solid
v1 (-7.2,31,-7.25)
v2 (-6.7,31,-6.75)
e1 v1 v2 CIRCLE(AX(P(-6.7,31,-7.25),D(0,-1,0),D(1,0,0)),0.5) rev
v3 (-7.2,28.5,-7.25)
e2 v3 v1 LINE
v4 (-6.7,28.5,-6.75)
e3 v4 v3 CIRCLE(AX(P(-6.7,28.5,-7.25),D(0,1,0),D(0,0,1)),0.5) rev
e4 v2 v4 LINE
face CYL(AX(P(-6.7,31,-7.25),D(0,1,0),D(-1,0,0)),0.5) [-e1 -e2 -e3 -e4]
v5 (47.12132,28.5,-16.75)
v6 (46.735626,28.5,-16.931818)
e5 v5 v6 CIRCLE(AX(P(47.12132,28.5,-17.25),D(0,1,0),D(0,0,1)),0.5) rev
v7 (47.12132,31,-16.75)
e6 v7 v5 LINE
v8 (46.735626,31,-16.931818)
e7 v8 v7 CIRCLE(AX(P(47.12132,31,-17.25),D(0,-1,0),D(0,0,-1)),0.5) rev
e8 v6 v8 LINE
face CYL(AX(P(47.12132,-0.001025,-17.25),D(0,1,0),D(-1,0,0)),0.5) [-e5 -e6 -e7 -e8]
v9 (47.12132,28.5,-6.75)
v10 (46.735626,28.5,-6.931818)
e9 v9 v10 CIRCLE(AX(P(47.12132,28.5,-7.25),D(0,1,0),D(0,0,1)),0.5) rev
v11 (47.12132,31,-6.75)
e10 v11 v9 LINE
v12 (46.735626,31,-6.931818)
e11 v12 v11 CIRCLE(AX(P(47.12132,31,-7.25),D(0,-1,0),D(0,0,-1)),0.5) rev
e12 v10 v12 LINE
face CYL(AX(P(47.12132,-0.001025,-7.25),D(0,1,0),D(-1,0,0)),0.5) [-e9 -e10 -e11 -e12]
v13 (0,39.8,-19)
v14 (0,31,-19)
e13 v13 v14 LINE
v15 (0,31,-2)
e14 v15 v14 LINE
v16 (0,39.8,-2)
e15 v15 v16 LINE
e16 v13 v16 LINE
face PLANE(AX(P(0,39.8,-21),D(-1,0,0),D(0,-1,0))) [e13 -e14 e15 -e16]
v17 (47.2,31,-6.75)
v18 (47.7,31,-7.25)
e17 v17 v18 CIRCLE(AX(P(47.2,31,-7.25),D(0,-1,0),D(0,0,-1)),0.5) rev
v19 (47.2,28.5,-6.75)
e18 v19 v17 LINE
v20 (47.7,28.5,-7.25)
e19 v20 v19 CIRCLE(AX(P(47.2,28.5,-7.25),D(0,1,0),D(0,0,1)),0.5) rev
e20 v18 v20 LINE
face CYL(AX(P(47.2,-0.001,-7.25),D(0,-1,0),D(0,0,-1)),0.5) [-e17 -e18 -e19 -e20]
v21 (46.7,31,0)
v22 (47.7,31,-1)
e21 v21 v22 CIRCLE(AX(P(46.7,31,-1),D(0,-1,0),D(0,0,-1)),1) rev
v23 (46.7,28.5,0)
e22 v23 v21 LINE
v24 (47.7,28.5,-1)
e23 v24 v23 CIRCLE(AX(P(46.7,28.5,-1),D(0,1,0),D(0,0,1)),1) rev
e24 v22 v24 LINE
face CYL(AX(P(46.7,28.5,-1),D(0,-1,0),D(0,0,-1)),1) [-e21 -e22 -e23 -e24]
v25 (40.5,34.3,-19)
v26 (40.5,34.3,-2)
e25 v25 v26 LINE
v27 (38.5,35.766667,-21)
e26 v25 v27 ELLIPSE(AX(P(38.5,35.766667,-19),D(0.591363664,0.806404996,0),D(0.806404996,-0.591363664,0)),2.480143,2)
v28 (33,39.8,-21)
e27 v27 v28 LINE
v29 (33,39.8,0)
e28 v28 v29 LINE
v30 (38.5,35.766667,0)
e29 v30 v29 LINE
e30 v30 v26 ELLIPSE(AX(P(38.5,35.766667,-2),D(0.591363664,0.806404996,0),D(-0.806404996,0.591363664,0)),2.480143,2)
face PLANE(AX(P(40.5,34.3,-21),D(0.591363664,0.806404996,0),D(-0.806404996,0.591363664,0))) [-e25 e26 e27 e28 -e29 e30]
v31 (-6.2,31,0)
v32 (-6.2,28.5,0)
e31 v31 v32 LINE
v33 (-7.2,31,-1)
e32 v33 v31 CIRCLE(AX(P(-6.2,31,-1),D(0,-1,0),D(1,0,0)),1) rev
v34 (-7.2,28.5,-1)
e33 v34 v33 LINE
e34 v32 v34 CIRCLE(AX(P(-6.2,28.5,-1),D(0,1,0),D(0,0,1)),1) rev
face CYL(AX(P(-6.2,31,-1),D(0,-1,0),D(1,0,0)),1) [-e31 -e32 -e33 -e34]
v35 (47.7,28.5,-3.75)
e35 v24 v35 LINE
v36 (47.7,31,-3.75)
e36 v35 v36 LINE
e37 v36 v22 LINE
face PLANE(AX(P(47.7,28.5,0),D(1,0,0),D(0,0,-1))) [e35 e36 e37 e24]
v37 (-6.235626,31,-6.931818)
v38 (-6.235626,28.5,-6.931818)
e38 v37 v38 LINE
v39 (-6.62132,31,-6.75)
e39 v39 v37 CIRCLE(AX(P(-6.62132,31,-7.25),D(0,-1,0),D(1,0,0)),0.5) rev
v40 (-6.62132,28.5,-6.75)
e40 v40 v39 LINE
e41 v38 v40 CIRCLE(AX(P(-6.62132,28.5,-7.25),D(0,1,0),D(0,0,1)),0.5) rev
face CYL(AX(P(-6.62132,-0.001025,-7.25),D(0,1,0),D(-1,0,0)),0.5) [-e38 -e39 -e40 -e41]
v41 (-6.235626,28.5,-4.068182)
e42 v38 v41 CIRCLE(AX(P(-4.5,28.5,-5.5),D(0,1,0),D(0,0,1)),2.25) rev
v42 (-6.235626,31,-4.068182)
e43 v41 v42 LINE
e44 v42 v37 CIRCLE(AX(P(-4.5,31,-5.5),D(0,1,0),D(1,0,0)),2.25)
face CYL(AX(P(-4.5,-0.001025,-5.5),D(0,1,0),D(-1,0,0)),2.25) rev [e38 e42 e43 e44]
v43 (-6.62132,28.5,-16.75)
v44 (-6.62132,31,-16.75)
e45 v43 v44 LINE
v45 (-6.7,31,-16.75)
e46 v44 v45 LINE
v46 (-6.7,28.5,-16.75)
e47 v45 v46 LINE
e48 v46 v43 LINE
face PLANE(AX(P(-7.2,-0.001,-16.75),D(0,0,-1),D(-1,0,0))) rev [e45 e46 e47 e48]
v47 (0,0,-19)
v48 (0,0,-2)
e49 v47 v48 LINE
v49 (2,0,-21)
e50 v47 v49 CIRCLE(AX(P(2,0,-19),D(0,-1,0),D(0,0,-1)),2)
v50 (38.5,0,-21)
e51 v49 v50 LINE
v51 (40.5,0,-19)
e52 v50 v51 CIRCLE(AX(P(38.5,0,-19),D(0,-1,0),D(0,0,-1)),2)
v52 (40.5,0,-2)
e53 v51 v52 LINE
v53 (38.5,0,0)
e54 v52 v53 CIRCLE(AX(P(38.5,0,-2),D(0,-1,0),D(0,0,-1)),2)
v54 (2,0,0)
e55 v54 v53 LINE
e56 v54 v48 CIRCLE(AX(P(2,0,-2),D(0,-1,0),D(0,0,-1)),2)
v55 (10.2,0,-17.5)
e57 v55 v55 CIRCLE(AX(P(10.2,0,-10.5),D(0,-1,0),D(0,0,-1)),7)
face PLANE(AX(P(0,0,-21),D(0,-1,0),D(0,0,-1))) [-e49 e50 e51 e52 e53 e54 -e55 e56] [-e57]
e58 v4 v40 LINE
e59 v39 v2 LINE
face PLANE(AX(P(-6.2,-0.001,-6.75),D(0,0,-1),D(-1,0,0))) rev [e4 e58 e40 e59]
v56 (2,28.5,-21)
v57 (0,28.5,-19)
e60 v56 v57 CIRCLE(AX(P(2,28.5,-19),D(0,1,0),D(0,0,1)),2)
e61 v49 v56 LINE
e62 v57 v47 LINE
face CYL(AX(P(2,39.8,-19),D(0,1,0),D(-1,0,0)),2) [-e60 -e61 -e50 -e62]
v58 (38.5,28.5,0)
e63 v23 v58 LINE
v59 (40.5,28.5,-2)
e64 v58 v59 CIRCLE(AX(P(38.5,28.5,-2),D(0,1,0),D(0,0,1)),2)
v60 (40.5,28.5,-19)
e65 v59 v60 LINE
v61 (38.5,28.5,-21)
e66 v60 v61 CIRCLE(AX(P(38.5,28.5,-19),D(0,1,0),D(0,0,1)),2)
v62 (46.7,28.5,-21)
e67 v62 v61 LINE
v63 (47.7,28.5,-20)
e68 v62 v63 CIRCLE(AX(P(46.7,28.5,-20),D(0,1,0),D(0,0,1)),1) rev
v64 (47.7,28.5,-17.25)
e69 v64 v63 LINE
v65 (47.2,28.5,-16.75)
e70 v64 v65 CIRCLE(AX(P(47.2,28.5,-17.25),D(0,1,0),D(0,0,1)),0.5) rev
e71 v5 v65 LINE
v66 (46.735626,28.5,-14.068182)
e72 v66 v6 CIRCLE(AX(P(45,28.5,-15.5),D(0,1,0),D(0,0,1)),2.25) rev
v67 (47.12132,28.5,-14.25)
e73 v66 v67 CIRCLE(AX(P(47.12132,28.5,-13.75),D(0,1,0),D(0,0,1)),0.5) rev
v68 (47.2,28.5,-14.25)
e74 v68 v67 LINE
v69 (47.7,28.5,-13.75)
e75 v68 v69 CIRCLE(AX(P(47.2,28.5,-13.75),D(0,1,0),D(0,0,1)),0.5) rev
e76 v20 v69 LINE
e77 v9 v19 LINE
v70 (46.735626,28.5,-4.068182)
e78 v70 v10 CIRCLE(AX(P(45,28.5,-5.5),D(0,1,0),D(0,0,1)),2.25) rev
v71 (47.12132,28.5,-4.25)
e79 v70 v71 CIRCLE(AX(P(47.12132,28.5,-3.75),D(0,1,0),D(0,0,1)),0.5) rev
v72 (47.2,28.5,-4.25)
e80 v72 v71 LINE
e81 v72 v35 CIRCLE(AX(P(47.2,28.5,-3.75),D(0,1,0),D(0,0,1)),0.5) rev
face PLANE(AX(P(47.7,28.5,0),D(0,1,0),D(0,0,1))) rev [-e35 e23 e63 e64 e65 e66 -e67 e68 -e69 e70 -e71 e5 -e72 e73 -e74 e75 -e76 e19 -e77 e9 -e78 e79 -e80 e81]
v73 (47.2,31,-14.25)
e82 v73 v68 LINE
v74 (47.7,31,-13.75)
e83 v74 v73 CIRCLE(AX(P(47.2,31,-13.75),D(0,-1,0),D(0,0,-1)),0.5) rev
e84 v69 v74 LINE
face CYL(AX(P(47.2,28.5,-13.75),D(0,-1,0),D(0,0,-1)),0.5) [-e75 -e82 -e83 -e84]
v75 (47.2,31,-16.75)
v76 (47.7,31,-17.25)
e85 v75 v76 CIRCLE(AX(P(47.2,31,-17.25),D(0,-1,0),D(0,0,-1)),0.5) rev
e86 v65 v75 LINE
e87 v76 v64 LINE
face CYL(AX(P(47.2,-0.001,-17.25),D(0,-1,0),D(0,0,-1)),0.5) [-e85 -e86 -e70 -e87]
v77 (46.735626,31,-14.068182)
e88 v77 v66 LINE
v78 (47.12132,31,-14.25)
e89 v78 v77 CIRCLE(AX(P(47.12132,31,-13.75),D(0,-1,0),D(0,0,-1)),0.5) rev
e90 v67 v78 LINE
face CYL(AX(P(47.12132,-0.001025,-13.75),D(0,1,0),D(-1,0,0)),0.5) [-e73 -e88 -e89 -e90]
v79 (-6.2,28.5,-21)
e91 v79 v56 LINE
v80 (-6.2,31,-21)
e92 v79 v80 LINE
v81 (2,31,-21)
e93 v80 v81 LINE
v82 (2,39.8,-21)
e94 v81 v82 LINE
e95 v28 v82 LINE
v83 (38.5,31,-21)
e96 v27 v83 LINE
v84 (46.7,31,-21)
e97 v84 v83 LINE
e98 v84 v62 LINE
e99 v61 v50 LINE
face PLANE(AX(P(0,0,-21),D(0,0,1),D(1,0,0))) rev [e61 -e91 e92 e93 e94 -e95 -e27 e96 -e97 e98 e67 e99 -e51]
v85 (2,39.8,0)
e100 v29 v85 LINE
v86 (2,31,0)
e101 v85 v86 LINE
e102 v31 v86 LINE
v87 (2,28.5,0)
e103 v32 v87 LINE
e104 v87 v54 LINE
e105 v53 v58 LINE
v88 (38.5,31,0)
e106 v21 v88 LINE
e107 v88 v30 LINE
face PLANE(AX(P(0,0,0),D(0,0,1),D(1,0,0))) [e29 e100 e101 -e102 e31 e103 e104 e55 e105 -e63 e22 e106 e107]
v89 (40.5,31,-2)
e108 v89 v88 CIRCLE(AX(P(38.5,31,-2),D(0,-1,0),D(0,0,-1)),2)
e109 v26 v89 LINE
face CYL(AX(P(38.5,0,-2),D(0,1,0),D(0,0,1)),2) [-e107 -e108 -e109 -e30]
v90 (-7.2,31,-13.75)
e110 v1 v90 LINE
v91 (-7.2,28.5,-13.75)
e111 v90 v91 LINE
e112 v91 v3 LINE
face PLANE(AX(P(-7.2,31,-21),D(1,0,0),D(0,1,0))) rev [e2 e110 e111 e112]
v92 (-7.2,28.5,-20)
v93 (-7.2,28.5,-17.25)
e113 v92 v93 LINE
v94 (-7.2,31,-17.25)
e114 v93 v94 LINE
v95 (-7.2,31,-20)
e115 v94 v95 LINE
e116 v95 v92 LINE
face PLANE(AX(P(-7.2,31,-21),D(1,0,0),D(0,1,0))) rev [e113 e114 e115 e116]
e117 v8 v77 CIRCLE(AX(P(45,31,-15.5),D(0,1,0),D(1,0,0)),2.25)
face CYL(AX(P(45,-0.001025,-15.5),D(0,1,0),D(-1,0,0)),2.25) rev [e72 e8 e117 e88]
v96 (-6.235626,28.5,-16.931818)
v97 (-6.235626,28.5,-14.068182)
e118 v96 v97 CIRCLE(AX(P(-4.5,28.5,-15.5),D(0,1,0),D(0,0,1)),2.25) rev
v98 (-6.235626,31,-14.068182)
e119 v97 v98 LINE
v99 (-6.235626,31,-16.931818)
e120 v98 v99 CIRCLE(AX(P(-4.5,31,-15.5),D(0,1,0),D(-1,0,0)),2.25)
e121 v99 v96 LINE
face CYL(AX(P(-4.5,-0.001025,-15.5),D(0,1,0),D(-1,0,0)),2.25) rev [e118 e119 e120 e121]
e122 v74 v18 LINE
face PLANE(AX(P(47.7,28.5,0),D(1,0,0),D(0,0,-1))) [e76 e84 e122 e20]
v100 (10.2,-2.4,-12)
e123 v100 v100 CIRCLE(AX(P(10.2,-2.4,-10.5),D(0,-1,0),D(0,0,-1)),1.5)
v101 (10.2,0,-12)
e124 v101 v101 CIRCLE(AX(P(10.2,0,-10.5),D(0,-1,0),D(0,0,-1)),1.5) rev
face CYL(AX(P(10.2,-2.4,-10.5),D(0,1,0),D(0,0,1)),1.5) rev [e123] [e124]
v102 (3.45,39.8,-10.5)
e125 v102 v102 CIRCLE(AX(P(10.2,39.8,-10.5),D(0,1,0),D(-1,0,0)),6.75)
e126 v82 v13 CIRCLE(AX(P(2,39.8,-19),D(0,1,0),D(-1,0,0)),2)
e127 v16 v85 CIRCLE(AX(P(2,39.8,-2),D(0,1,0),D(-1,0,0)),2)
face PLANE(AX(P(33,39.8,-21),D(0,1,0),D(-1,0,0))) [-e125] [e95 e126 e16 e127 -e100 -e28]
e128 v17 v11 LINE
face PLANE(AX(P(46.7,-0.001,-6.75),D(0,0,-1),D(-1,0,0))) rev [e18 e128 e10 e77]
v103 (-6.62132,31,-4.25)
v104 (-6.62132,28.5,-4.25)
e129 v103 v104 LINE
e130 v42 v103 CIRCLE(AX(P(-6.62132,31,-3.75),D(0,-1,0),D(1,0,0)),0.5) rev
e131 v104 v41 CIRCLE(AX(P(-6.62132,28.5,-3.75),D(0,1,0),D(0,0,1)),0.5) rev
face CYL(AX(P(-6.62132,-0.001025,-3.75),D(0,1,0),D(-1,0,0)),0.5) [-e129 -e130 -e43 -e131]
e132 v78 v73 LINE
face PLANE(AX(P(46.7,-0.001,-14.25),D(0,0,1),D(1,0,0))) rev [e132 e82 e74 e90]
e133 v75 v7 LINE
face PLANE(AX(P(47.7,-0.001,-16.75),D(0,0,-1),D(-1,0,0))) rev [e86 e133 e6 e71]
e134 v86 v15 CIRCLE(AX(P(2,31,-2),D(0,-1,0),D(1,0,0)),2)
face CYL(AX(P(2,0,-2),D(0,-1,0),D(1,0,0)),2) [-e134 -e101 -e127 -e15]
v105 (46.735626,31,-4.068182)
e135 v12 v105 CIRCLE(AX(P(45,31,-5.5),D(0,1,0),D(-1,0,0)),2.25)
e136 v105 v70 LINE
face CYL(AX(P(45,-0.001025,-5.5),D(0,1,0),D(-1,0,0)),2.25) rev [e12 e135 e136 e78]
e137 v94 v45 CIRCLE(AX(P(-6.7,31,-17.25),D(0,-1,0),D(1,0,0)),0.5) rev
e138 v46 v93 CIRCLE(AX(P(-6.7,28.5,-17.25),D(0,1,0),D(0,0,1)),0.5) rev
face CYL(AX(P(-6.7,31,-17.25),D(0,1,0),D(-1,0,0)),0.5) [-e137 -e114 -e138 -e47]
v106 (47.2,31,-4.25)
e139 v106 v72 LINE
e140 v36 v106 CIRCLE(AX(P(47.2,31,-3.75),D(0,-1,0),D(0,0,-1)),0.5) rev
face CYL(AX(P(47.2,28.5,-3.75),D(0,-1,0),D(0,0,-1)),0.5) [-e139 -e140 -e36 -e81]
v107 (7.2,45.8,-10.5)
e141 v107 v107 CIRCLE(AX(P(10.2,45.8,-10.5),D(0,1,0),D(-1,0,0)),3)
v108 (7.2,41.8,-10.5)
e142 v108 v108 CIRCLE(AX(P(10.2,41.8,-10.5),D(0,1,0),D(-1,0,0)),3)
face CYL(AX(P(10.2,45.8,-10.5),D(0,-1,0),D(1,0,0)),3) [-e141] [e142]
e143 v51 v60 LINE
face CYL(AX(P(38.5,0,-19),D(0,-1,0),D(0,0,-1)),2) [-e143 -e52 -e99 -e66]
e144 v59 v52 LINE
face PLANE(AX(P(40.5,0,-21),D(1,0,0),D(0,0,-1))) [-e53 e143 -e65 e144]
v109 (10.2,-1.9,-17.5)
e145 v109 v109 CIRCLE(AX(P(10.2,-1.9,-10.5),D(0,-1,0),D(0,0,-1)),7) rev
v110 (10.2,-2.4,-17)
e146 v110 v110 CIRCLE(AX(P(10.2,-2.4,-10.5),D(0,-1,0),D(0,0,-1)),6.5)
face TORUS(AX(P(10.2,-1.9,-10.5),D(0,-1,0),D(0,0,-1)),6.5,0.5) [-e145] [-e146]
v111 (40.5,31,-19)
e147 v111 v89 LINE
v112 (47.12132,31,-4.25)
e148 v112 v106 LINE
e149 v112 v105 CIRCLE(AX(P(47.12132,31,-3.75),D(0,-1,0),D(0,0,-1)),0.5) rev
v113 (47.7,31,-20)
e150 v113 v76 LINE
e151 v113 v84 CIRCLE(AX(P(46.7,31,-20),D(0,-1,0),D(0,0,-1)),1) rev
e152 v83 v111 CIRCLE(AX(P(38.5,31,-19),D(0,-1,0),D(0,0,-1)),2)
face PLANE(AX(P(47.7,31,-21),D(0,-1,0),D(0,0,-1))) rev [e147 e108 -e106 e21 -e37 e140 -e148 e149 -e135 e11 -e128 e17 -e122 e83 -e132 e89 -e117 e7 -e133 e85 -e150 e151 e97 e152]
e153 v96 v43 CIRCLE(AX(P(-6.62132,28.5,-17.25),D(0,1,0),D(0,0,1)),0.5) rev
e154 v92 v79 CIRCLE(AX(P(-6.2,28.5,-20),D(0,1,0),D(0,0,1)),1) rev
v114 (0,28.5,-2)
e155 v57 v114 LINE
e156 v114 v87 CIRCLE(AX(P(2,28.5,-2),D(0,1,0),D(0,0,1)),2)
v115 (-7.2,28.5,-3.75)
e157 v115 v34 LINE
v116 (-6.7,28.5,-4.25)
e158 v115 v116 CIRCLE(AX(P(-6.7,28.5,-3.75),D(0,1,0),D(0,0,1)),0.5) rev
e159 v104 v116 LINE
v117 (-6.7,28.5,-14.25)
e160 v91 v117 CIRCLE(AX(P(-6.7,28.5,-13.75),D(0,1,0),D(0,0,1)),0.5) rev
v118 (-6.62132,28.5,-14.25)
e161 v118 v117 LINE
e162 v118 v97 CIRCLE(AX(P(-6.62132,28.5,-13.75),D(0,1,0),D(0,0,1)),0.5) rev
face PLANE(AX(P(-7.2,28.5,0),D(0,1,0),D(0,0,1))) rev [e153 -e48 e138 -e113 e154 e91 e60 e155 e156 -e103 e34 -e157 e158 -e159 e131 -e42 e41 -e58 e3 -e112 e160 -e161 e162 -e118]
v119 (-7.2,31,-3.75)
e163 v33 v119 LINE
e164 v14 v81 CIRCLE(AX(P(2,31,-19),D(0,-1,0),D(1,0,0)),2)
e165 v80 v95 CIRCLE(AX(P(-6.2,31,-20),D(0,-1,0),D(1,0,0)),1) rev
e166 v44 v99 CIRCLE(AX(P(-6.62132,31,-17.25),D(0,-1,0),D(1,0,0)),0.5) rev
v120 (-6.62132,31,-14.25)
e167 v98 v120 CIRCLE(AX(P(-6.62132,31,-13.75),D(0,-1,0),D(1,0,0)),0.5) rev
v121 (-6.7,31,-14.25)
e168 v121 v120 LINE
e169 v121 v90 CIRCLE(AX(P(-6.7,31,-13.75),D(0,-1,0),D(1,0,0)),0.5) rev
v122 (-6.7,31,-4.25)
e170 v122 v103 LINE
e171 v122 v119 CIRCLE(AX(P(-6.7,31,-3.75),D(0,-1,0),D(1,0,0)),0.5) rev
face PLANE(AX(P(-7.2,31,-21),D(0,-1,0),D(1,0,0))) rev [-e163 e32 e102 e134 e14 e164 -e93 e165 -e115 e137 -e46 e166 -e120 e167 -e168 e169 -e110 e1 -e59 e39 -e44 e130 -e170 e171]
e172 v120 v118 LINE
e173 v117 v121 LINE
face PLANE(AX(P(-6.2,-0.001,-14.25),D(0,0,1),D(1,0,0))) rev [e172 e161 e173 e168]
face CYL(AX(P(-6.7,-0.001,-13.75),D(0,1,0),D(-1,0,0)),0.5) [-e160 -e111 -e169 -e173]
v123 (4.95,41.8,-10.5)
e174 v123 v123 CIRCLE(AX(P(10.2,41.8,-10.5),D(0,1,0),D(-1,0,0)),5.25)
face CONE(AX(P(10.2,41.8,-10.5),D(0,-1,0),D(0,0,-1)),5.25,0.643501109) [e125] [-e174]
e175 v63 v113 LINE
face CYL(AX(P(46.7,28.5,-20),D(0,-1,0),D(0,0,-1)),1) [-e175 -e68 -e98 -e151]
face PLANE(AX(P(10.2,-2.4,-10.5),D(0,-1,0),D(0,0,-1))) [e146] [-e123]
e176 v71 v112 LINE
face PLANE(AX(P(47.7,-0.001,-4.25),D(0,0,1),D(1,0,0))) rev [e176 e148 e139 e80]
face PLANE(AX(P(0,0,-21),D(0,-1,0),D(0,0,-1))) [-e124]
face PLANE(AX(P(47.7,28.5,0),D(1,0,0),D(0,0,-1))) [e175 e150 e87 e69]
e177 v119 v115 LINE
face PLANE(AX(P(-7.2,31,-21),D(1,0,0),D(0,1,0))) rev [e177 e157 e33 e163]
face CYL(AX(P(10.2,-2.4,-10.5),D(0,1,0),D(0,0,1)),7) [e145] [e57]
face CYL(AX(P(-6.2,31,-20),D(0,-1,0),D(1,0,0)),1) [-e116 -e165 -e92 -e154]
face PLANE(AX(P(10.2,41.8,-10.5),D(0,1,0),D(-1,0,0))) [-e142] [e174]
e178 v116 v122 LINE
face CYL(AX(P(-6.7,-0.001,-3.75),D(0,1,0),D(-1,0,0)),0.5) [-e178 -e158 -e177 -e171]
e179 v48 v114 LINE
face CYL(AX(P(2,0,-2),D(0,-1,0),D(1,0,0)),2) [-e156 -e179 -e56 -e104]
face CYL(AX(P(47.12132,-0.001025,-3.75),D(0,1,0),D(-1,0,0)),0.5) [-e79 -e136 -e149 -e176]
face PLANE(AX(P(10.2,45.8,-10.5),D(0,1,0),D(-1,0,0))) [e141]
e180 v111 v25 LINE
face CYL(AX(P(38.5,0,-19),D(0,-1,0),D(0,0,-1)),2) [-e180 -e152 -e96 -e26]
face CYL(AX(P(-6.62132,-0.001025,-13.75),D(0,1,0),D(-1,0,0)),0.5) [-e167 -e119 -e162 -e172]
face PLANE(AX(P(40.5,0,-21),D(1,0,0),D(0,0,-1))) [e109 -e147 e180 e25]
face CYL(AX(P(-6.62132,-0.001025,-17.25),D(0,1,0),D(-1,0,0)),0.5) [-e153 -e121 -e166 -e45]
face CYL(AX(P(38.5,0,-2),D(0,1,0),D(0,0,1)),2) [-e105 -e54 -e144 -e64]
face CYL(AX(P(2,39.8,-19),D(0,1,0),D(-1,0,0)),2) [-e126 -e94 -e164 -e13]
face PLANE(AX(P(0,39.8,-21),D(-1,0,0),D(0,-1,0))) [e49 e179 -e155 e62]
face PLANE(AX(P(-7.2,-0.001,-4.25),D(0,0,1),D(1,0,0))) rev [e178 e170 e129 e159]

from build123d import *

# Parameters (mm, degrees)
EXTRUSION1_DEPTH = 21
ESQUISSE2_W      = 21
ESQUISSE2_H      = 2.5
EXTRUSION2_DEPTH = 7.2
ESQUISSE3_W      = 21
ESQUISSE3_H      = 2.5
EXTRUSION3_DEPTH = 7.2
EXTRUSION4_REACH = 62.641
ESQUISSE4_R      = 2.25
CONG_1_R         = 1
CONG_2_R         = 2
ESQUISSE5_R      = 3
EXTRUSION5_DEPTH = 6
ESQUISSE7_R      = 6.75
EXTRUSION6_DEPTH = 2
CHANFREIN1_SIZE2 = 1.5
CHANFREIN1_SIZE  = 2
EXTRUSION7_REACH = 62.641
ESQUISSE8_W      = 1
ESQUISSE8_H      = 2.5
CONG_3_R         = 0.5
ESQUISSE9_R      = 7
ESQUISSE9_R_2    = 1.5
EXTRUSION8_DEPTH = 2.4
CONG_4_R         = 0.5


with BuildPart() as part:
    # Esquisse1 → Extrusion1 (new body)
    with BuildSketch(Plane.XY):
        Polygon((0, 0), (40.5, 0), (40.5, 34.3), (33, 39.8), (0, 39.8), align=None)
    extrude(amount=-EXTRUSION1_DEPTH)

    # Esquisse2 → Extrusion2 (add)
    with BuildSketch(Plane(origin=(40.5, 0, 0), x_dir=(0, 0, -1), z_dir=(1, 0, 0))):
        with Locations((10.5, 29.75)):
            Rectangle(ESQUISSE2_W, ESQUISSE2_H)
    extrude(amount=EXTRUSION2_DEPTH)

    # Esquisse3 → Extrusion3 (add)
    with BuildSketch(Plane.ZY):
        with Locations((-10.5, 29.75)):
            Rectangle(ESQUISSE3_W, ESQUISSE3_H)
    extrude(amount=EXTRUSION3_DEPTH)

    # Esquisse4 → Extrusion4 (cut, up to next)
    with BuildSketch(Plane(origin=(0, 31, 0), x_dir=(-1, 0, 0), z_dir=(0, 1, 0)), mode=Mode.PRIVATE) as extrusion4_sk1:
        with Locations((4.5, -15.5)):
            Circle(ESQUISSE4_R)
    extrusion4_tool1 = extrude(extrusion4_sk1.sketch, amount=-EXTRUSION4_REACH, mode=Mode.PRIVATE) & part.part
    # Esquisse4 → Extrusion4 (cut, up to next)
    with BuildSketch(Plane(origin=(0, 31, 0), x_dir=(-1, 0, 0), z_dir=(0, 1, 0)), mode=Mode.PRIVATE) as extrusion4_sk2:
        with Locations(Location((-45, -15.5, 0), (0, 0, 90))):
            Circle(ESQUISSE4_R)
    extrusion4_tool2 = extrude(extrusion4_sk2.sketch, amount=-EXTRUSION4_REACH, mode=Mode.PRIVATE) & part.part
    # Esquisse4 → Extrusion4 (cut, up to next)
    with BuildSketch(Plane(origin=(0, 31, 0), x_dir=(-1, 0, 0), z_dir=(0, 1, 0)), mode=Mode.PRIVATE) as extrusion4_sk3:
        with Locations((-45, -5.5)):
            Circle(ESQUISSE4_R)
    extrusion4_tool3 = extrude(extrusion4_sk3.sketch, amount=-EXTRUSION4_REACH, mode=Mode.PRIVATE) & part.part
    # Esquisse4 → Extrusion4 (cut, up to next)
    with BuildSketch(Plane(origin=(0, 31, 0), x_dir=(-1, 0, 0), z_dir=(0, 1, 0)), mode=Mode.PRIVATE) as extrusion4_sk4:
        with Locations(Location((4.5, -5.5, 0), (0, 0, 90))):
            Circle(ESQUISSE4_R)
    extrusion4_tool4 = extrude(extrusion4_sk4.sketch, amount=-EXTRUSION4_REACH, mode=Mode.PRIVATE) & part.part
    add(extrusion4_tool1.solids().sort_by_distance((-4.5, 31, -15.5))[0], mode=Mode.SUBTRACT)
    add(extrusion4_tool2.solids().sort_by_distance((45, 31, -15.5))[0], mode=Mode.SUBTRACT)
    add(extrusion4_tool3.solids().sort_by_distance((45, 31, -5.5))[0], mode=Mode.SUBTRACT)
    add(extrusion4_tool4.solids().sort_by_distance((-4.5, 31, -5.5))[0], mode=Mode.SUBTRACT)

    # Congé1
    cong_1_edges = [part.edges().sort_by_distance(p)[0] for p in [
        (47.7, 29.75, 0),
        (47.7, 29.75, -21),
        (-7.2, 29.75, -21),
        (-7.2, 29.75, 0),
    ]]
    fillet(cong_1_edges, radius=CONG_1_R)

    # Congé2
    cong_2_edges = [part.edges().sort_by_distance(p)[0] for p in [
        (0, 35.4, -21),
        (0, 14.25, -21),
        (0, 35.4, 0),
        (0, 14.25, 0),
        (40.5, 32.65, 0),
        (40.5, 14.25, 0),
        (40.5, 32.65, -21),
        (40.5, 14.25, -21),
    ]]
    fillet(cong_2_edges, radius=CONG_2_R)

    # Esquisse5 → Extrusion5 (add)
    with BuildSketch(Plane(origin=(0, 39.8, 0), x_dir=(-1, 0, 0), z_dir=(0, 1, 0))):
        with Locations((-10.2, -10.5)):
            Circle(ESQUISSE5_R)
    extrude(amount=EXTRUSION5_DEPTH)

    # Esquisse7 → Extrusion6 (add)
    with BuildSketch(Plane(origin=(0, 39.8, 0), x_dir=(-1, 0, 0), z_dir=(0, 1, 0))):
        with Locations((-10.2, -10.5)):
            Circle(ESQUISSE7_R)
    extrude(amount=EXTRUSION6_DEPTH)

    # Chanfrein1
    chanfrein1_edges = [part.edges().sort_by_distance(p)[0] for p in [
        (16.95, 41.8, -10.5),
    ]]
    chanfrein1_side = [part.faces().sort_by_distance(p)[0] for p in [
        (16.95, 41.77, -10.5),
    ]]
    chamfer(chanfrein1_edges, length=CHANFREIN1_SIZE - 0.0001, length2=CHANFREIN1_SIZE2 - 0.0001, reference=chanfrein1_side[0])  # a hair under: the kernel refuses the full size

    # Esquisse8 → Extrusion7 (cut, up to next)
    with BuildSketch(Plane(origin=(0, 31, 0), x_dir=(-1, 0, 0), z_dir=(0, 1, 0)), mode=Mode.PRIVATE) as extrusion7_sk1:
        with Locations((6.7, -15.5)):
            Rectangle(ESQUISSE8_W, ESQUISSE8_H)
    extrusion7_tool1 = extrude(extrusion7_sk1.sketch, amount=-EXTRUSION7_REACH, mode=Mode.PRIVATE) & part.part
    # Esquisse8 → Extrusion7 (cut, up to next)
    with BuildSketch(Plane(origin=(0, 31, 0), x_dir=(-1, 0, 0), z_dir=(0, 1, 0)), mode=Mode.PRIVATE) as extrusion7_sk2:
        with Locations((6.7, -5.5)):
            Rectangle(ESQUISSE8_W, ESQUISSE8_H)
    extrusion7_tool2 = extrude(extrusion7_sk2.sketch, amount=-EXTRUSION7_REACH, mode=Mode.PRIVATE) & part.part
    # Esquisse8 → Extrusion7 (cut, up to next)
    with BuildSketch(Plane(origin=(0, 31, 0), x_dir=(-1, 0, 0), z_dir=(0, 1, 0)), mode=Mode.PRIVATE) as extrusion7_sk3:
        with Locations((-47.2, -15.5)):
            Rectangle(ESQUISSE8_W, ESQUISSE8_H)
    extrusion7_tool3 = extrude(extrusion7_sk3.sketch, amount=-EXTRUSION7_REACH, mode=Mode.PRIVATE) & part.part
    # Esquisse8 → Extrusion7 (cut, up to next)
    with BuildSketch(Plane(origin=(0, 31, 0), x_dir=(-1, 0, 0), z_dir=(0, 1, 0)), mode=Mode.PRIVATE) as extrusion7_sk4:
        with Locations((-47.2, -5.5)):
            Rectangle(ESQUISSE8_W, ESQUISSE8_H)
    extrusion7_tool4 = extrude(extrusion7_sk4.sketch, amount=-EXTRUSION7_REACH, mode=Mode.PRIVATE) & part.part
    add(extrusion7_tool1.solids().sort_by_distance((-6.7, 31, -15.5))[0], mode=Mode.SUBTRACT)
    add(extrusion7_tool2.solids().sort_by_distance((-6.7, 31, -5.5))[0], mode=Mode.SUBTRACT)
    add(extrusion7_tool3.solids().sort_by_distance((47.2, 31, -15.5))[0], mode=Mode.SUBTRACT)
    add(extrusion7_tool4.solids().sort_by_distance((47.2, 31, -5.5))[0], mode=Mode.SUBTRACT)

    # Congé3
    cong_3_edges = [part.edges().sort_by_distance(p)[0] for p in [
        (-7.2, 29.75, -14.25),
        (-7.2, 29.75, -16.75),
        (-6.370828693, 29.75, -16.75),
        (-6.370828693, 29.75, -14.25),
        (-6.370828693, 29.75, -6.75),
        (-6.370828693, 29.75, -4.25),
        (-7.2, 29.75, -6.75),
        (-7.2, 29.75, -4.25),
        (46.870828693, 29.75, -14.25),
        (46.870828693, 29.75, -16.75),
        (47.7, 29.75, -14.25),
        (47.7, 29.75, -16.75),
        (47.7, 29.75, -6.75),
        (47.7, 29.75, -4.25),
        (46.870828693, 29.75, -6.75),
        (46.870828693, 29.75, -4.25),
    ]]
    fillet(cong_3_edges, radius=CONG_3_R)

    # Esquisse9 → Extrusion8 (add)
    with BuildSketch(Plane.XZ):
        with Locations(Location((10.2, -10.5, 0), (0, 0, 270))):
            Circle(ESQUISSE9_R)
        with Locations(Location((10.2, -10.5, 0), (0, 0, 270))):
            Circle(ESQUISSE9_R_2, mode=Mode.SUBTRACT)
    extrude(amount=EXTRUSION8_DEPTH)

    # Congé4
    cong_4_edges = [part.edges().sort_by_distance(p)[0] for p in [
        (10.2, -2.4, -3.5),
    ]]
    fillet(cong_4_edges, radius=CONG_4_R)


solid = part.part
